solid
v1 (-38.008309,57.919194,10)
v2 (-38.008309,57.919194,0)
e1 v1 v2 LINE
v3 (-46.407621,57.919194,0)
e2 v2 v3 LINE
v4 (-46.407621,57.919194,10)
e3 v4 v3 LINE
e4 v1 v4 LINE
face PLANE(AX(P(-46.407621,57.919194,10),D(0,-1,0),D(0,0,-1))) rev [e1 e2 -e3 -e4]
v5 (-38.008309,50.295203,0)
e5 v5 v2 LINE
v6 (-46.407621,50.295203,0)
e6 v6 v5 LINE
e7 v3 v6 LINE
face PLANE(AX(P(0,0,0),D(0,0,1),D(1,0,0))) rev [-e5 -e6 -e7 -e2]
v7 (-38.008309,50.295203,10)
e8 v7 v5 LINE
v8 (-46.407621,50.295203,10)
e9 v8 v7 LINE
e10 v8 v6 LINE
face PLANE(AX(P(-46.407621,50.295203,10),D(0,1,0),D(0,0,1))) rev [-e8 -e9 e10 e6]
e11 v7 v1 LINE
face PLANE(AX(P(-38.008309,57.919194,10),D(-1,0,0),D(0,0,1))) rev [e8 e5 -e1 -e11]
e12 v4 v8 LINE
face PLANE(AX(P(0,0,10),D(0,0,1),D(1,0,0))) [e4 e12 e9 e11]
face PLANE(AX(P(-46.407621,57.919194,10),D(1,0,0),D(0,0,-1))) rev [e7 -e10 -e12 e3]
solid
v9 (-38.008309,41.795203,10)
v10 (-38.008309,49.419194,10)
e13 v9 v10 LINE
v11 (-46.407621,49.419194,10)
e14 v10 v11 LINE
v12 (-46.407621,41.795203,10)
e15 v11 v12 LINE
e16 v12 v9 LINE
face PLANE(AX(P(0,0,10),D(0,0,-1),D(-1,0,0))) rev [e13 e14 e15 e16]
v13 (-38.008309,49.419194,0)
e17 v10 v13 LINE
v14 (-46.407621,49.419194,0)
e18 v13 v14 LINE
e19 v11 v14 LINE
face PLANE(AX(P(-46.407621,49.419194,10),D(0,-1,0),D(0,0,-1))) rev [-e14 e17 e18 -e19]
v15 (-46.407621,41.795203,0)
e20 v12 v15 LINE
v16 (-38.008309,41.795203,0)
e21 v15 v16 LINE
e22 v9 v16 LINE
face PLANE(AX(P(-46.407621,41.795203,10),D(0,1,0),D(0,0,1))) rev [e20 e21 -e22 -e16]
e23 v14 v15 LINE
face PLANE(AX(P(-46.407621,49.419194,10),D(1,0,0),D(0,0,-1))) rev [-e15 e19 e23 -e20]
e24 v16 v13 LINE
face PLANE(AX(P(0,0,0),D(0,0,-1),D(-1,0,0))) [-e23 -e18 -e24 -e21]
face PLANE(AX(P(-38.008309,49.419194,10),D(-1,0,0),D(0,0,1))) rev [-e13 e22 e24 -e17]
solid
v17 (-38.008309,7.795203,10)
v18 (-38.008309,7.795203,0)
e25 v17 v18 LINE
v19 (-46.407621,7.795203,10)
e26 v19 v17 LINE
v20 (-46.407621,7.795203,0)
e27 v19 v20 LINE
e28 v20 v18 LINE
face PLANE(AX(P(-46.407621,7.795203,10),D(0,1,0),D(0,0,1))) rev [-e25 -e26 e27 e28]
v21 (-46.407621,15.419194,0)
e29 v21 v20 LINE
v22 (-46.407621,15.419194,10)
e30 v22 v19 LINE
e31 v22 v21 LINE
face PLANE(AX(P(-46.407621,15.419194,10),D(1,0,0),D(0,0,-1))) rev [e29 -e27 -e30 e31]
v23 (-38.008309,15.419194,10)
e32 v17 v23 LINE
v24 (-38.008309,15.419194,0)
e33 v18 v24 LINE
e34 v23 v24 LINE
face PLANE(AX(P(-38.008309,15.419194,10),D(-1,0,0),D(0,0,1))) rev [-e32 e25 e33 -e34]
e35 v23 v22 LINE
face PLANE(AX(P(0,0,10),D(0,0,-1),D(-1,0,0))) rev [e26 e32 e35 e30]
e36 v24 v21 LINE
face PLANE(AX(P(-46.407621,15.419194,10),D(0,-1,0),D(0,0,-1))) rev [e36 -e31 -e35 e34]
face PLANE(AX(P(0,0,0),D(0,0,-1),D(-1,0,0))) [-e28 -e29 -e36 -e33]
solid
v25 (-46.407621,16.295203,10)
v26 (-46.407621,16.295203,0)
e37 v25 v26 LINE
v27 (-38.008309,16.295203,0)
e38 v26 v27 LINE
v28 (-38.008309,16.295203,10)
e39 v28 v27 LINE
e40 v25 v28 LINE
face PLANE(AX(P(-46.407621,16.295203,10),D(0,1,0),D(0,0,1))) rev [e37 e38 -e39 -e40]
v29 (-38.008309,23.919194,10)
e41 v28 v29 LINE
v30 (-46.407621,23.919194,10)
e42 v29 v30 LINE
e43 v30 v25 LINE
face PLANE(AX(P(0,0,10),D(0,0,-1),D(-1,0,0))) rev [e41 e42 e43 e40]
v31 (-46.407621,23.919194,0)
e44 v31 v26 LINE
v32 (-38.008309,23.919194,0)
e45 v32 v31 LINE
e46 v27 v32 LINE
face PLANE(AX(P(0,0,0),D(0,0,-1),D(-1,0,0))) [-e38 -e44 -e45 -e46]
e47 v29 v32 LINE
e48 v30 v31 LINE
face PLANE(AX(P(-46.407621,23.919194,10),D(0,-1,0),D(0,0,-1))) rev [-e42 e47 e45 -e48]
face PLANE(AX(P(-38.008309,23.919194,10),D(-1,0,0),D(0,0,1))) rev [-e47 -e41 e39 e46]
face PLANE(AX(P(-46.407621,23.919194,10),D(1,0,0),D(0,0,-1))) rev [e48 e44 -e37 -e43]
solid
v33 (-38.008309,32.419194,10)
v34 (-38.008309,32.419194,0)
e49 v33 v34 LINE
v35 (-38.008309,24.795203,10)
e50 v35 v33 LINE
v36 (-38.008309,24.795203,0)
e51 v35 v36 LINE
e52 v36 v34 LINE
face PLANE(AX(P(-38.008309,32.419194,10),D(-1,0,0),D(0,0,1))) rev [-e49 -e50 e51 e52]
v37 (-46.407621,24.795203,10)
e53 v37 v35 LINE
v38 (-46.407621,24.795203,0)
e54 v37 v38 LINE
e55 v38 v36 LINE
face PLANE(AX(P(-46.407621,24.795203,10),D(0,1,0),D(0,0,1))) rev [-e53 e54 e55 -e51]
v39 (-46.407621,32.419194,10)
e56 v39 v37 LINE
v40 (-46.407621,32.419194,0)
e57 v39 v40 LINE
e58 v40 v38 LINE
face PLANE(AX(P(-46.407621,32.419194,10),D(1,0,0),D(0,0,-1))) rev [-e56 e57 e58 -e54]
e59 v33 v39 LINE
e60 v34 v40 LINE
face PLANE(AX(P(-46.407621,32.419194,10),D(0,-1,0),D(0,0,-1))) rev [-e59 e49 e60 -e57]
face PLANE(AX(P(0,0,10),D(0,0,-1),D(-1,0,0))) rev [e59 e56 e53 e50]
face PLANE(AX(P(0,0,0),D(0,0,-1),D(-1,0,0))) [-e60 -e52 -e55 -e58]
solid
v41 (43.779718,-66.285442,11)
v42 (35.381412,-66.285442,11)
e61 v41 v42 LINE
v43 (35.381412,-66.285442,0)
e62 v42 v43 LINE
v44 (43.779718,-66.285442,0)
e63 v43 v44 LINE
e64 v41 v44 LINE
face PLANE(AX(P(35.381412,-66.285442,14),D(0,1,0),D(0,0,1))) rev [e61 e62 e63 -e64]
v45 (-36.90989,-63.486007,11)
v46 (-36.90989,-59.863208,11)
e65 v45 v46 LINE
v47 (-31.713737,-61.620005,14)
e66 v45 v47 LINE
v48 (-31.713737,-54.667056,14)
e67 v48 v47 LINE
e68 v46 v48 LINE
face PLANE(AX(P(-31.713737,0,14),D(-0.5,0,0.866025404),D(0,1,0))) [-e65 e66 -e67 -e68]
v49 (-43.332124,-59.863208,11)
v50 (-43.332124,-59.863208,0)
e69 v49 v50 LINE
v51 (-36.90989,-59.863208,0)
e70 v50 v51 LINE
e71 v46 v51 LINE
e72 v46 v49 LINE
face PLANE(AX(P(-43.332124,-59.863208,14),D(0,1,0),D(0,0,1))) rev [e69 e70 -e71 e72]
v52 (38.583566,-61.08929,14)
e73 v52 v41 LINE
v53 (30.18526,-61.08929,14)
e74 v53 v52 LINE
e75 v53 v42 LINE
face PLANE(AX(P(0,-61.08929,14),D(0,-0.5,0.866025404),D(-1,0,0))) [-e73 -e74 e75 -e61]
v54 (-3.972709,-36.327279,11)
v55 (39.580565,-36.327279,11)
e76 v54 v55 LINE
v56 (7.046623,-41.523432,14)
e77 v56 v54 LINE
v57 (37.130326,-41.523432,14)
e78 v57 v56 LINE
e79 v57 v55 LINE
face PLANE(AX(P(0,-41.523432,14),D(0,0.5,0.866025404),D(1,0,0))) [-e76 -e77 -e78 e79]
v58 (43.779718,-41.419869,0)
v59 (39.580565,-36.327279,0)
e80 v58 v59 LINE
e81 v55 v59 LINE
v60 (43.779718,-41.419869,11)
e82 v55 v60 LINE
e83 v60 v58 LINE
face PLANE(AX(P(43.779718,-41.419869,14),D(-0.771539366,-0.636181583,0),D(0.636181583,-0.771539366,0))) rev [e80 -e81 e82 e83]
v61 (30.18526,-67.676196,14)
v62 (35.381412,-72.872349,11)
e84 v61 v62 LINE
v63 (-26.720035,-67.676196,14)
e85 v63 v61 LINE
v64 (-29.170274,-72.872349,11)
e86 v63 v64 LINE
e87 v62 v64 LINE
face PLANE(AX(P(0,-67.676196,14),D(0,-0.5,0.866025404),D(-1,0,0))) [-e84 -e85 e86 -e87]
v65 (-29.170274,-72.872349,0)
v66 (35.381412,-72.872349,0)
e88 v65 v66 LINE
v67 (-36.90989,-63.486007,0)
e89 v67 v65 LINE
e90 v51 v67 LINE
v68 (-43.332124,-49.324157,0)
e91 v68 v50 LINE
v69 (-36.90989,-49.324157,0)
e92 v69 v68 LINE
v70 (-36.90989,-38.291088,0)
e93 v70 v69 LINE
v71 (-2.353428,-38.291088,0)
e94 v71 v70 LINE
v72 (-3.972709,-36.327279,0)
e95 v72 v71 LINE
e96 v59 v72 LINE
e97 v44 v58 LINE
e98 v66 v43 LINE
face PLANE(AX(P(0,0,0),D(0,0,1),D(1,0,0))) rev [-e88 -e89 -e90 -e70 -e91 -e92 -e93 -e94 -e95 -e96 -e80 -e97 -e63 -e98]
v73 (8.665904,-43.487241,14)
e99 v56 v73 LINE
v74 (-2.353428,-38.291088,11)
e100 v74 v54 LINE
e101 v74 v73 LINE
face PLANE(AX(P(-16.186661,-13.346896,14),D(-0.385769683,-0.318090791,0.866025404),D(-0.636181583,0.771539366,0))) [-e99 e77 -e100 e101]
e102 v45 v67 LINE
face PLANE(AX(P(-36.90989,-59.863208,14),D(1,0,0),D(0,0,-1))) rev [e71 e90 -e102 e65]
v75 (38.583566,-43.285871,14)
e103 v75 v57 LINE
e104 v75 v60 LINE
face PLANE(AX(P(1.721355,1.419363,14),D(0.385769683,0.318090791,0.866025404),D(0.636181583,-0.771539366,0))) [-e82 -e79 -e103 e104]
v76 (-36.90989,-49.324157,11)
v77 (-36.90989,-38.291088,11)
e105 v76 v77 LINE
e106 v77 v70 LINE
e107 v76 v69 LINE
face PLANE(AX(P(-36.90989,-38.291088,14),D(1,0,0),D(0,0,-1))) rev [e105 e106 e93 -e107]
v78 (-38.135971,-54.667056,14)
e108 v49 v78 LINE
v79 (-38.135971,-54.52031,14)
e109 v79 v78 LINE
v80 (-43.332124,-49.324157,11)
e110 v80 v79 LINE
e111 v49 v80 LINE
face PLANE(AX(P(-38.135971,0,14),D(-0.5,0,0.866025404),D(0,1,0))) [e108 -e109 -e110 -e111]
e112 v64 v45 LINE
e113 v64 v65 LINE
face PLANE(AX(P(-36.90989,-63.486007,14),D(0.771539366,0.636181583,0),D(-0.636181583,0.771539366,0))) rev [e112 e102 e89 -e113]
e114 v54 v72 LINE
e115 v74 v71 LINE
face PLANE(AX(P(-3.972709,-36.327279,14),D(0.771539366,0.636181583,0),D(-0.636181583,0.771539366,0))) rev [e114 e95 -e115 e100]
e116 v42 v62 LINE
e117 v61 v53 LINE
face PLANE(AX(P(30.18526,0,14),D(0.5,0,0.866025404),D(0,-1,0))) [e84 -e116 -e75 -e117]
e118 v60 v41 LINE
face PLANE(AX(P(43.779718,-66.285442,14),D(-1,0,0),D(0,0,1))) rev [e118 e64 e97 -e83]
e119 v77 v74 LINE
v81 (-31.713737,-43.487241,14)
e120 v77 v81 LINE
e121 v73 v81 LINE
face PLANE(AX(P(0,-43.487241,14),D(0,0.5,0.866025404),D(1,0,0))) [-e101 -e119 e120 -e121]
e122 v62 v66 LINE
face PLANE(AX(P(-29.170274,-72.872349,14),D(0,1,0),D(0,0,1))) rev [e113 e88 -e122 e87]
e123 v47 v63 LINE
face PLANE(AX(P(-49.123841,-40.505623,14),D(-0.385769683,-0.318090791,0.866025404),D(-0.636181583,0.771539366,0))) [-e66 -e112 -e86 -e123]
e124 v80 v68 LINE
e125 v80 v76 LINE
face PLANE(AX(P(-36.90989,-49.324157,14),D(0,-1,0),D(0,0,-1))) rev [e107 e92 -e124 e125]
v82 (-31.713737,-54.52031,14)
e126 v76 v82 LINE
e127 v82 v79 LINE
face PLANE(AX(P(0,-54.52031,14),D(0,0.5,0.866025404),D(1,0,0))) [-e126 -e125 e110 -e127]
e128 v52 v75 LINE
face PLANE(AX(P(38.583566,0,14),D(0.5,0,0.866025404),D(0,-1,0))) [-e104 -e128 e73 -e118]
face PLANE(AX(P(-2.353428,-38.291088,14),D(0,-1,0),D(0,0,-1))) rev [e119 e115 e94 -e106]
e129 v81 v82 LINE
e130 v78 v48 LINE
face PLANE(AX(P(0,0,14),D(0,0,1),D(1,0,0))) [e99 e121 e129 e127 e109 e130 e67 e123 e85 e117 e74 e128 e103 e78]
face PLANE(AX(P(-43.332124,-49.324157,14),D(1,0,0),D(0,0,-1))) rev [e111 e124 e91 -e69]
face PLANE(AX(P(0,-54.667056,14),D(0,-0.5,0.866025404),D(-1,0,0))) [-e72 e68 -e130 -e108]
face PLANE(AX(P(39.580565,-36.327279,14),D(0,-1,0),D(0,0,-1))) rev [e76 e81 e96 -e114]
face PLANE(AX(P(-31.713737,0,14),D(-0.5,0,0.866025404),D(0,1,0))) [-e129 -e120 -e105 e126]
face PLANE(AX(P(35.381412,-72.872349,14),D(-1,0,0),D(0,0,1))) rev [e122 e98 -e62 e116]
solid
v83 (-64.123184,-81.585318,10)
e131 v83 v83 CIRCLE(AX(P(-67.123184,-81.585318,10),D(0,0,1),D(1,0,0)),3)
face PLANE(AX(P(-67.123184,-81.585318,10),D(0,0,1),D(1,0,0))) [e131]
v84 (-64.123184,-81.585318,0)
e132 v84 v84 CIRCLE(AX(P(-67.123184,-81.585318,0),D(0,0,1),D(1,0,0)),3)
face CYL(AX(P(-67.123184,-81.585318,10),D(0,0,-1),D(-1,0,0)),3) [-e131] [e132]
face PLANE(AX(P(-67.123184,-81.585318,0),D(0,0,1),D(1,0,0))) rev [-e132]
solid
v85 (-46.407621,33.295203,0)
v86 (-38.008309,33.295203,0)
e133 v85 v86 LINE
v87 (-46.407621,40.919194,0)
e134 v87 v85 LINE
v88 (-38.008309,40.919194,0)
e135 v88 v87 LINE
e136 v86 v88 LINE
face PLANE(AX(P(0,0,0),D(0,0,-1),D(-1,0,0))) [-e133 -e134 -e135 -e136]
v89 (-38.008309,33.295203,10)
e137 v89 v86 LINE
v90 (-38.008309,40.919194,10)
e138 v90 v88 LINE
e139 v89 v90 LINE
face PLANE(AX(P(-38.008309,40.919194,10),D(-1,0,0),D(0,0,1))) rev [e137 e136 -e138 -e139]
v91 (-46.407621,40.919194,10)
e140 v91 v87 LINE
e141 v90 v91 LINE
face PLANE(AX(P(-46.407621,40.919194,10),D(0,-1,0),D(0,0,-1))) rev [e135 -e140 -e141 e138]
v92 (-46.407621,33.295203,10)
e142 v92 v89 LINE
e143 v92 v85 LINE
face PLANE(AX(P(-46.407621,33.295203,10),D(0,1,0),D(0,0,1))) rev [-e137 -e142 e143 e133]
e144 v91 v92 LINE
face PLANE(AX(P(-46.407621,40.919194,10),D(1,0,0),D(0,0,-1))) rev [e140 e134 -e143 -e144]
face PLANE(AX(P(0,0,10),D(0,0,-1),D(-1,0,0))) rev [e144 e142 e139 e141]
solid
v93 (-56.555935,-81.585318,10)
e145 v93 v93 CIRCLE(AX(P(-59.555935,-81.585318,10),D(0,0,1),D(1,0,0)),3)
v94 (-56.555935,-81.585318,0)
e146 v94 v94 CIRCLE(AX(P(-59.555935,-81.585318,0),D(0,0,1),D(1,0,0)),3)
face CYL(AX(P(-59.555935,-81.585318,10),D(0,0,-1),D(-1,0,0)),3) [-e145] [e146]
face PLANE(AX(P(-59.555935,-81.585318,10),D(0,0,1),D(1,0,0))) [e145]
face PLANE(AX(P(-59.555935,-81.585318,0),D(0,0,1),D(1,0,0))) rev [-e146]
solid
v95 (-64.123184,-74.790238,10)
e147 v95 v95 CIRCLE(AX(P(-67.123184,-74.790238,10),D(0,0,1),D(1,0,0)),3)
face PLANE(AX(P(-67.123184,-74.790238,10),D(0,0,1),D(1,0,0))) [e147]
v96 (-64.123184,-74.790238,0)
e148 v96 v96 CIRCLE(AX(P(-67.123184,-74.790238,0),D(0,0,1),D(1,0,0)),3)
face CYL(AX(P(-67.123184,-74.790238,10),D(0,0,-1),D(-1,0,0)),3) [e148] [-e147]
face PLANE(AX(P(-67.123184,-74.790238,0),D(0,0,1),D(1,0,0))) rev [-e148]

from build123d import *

# Parameters (mm, degrees)
EXTRUDE_1_DEPTH   = 14
SKETCH_2_R        = 3
EXTRUDE_2_DEPTH   = 10
EXTRUDE_2_2_DEPTH = 10
EXTRUDE_2_3_DEPTH = 10
SKETCH_2_W        = 8.399311933
SKETCH_2_H        = 7.623990832
EXTRUDE_2_4_DEPTH = 10
EXTRUDE_2_5_DEPTH = 10
EXTRUDE_2_6_DEPTH = 10
EXTRUDE_2_7_DEPTH = 10
EXTRUDE_2_8_DEPTH = 10
EXTRUDE_2_9_DEPTH = 10


with BuildPart() as part:
    # Эскиз1 → Бобышка-Вытянуть1 (new body)
    with BuildSketch(Plane.XY):
        Polygon((-36.909889511, -38.291088482), (-36.909889511, -49.324157276), (-43.332123585, -49.324157276), (-43.332123585, -59.863208064), (-36.909889511, -59.863208064), (-36.909889511, -63.486006772), (-29.170274088, -72.87234888), (35.381411989, -72.87234888), (35.381411989, -66.285442138), (43.779718086, -66.285442138), (43.779718086, -41.419869184), (39.580565037, -36.327279317), (-3.972709406, -36.327279317), (-2.353428165, -38.291088482), align=None)
    extrude(amount=EXTRUDE_1_DEPTH)

    # Фаска1
    # the kernel refuses this chamfer: 5.196152423, 3 mm, written as the material it takes off along each edge
    with BuildSketch(Plane(origin=(-36.909889511, -49.324157276, 14), x_dir=(0, 0.0578938624026709, -0.9983227437537926), z_dir=(-1, 0, 0)), Plane(origin=(-43.332123585, -59.863208064, 14), x_dir=(0, -0.0578938624026709, -0.9983227437537926), z_dir=(1, 0, 0))) as chamfer_1_piece_1:
        with BuildLine():
            Line((3.109137869, 0), (-0.414994971, 5.361118731))
            Line((-0.414994971, 5.361118731), (-0.518743714, 5.355102224))
            ThreePointArc((-0.518743714, 5.355102224), (-0.259371857, 2.677551112), (-0.103748743, -0.006016507))
            Line((-0.103748743, -0.006016507), (0.006016507, -0.103748743))
            ThreePointArc((0.006016507, -0.103748743), (1.555374994, -0.013899696), (3.115154376, -0.103748743))
            Line((3.115154376, -0.103748743), (3.109137869, 0))
        make_face()
    extrude(amount=6.422234074, mode=Mode.SUBTRACT)
    with BuildSketch(Plane(origin=(-43.332123585, -49.324157276, 14), x_dir=(-0.0578938624026709, 0, -0.9983227437537926), z_dir=(0, -1, 0))) as chamfer_1_piece_2:
        with BuildLine():
            Line((3.109137869, 0), (-0.414994971, 5.361118731))
            Line((-0.414994971, 5.361118731), (-0.518743714, 5.355102224))
            ThreePointArc((-0.518743714, 5.355102224), (-0.259371857, 2.677551112), (-0.103748743, -0.006016507))
            Line((-0.103748743, -0.006016507), (0.006016507, -0.103748743))
            ThreePointArc((0.006016507, -0.103748743), (1.555374994, -0.013899696), (3.115154376, -0.103748743))
            Line((3.115154376, -0.103748743), (3.109137869, 0))
        make_face()
    extrude(amount=10.539050788, mode=Mode.SUBTRACT)
    with BuildSketch(Plane(origin=(-36.909889511, -59.863208064, 14), x_dir=(-0.0578938624026709, 0, -0.9983227437537926), z_dir=(0, -1, 0))) as chamfer_1_piece_3_section:
        with BuildLine():
            Line((3.109137869, 0), (-0.414994971, 5.361118731))
            Line((-0.414994971, 5.361118731), (-0.518743714, 5.355102224))
            ThreePointArc((-0.518743714, 5.355102224), (-0.259371857, 2.677551112), (-0.103748743, -0.006016507))
            Line((-0.103748743, -0.006016507), (0.006016507, -0.103748743))
            ThreePointArc((0.006016507, -0.103748743), (1.555374994, -0.013899696), (3.115154376, -0.103748743))
            Line((3.115154376, -0.103748743), (3.109137869, 0))
        make_face()
    chamfer_1_piece_3 = extrude(amount=17.06569062, mode=Mode.PRIVATE)
    chamfer_1_piece_3 = split(chamfer_1_piece_3, bisect_by=Plane(origin=(-36.310735652, -64.212640175, 13.15573984), z_dir=(0.7715393663129642, 0.6361815827492885, 0)), keep=Keep.TOP, mode=Mode.PRIVATE)
    add(chamfer_1_piece_3, mode=Mode.SUBTRACT)
    with BuildSketch(Plane(origin=(-45.462009764, -53.114286465, 14), x_dir=(-0.04466739391156679, -0.03683100901480082, -0.9983227437537926), z_dir=(0.6361815827492885, -0.7715393663129642, 0))) as chamfer_1_piece_4_section:
        with BuildLine():
            Line((3.109137869, 0), (-0.414994971, 5.361118731))
            Line((-0.414994971, 5.361118731), (-0.518743714, 5.355102224))
            ThreePointArc((-0.518743714, 5.355102224), (-0.259371857, 2.677551112), (-0.103748743, -0.006016507))
            Line((-0.103748743, -0.006016507), (0.006016507, -0.103748743))
            ThreePointArc((0.006016507, -0.103748743), (1.555374994, -0.013899696), (3.115154376, -0.103748743))
            Line((3.115154376, -0.103748743), (3.109137869, 0))
        make_face()
    chamfer_1_piece_4 = extrude(amount=39.051517055, mode=Mode.PRIVATE)
    chamfer_1_piece_4 = split(chamfer_1_piece_4, bisect_by=Plane(origin=(-36.909889511, -66.628217191, 13.110188551), z_dir=(1, 0, 0)), keep=Keep.TOP, mode=Mode.PRIVATE)
    chamfer_1_piece_4 = split(chamfer_1_piece_4, bisect_by=Plane(origin=(-31.761219521, -72.87234888, 13.110188551), z_dir=(0, 1, 0)), keep=Keep.TOP, mode=Mode.PRIVATE)
    add(chamfer_1_piece_4, mode=Mode.SUBTRACT)
    with BuildSketch(Plane(origin=(-42.613166, -72.87234888, 14), x_dir=(0, -0.05789386240267318, -0.9983227437537925), z_dir=(1, 0, 0))) as chamfer_1_piece_5_section:
        with BuildLine():
            Line((3.109137869, 0), (-0.414994971, 5.361118731))
            Line((-0.414994971, 5.361118731), (-0.518743714, 5.355102224))
            ThreePointArc((-0.518743714, 5.355102224), (-0.259371857, 2.677551112), (-0.103748743, -0.006016507))
            Line((-0.103748743, -0.006016507), (0.006016507, -0.103748743))
            ThreePointArc((0.006016507, -0.103748743), (1.555374994, -0.013899696), (3.115154376, -0.103748743))
            Line((3.115154376, -0.103748743), (3.109137869, 0))
        make_face()
    chamfer_1_piece_5 = extrude(amount=77.994577989, mode=Mode.PRIVATE)
    chamfer_1_piece_5 = split(chamfer_1_piece_5, bisect_by=Plane(origin=(-17.2681662, -87.306820149, 13.044949629), z_dir=(0.7715393663129642, 0.6361815827492885, 0)), keep=Keep.TOP, mode=Mode.PRIVATE)
    add(chamfer_1_piece_5, mode=Mode.SUBTRACT)
    with BuildSketch(Plane(origin=(35.381411989, -72.87234888, 14), x_dir=(0.0578938624026709, 0, -0.9983227437537926), z_dir=(0, 1, 0))) as chamfer_1_piece_6:
        with BuildLine():
            Line((3.109137869, 0), (-0.414994971, 5.361118731))
            Line((-0.414994971, 5.361118731), (-0.518743714, 5.355102224))
            ThreePointArc((-0.518743714, 5.355102224), (-0.259371857, 2.677551112), (-0.103748743, -0.006016507))
            Line((-0.103748743, -0.006016507), (0.006016507, -0.103748743))
            ThreePointArc((0.006016507, -0.103748743), (1.555374994, -0.013899696), (3.115154376, -0.103748743))
            Line((3.115154376, -0.103748743), (3.109137869, 0))
        make_face()
    extrude(amount=6.586906743, mode=Mode.SUBTRACT)
    with BuildSketch(Plane(origin=(35.381411989, -66.285442138, 14), x_dir=(0, -0.05789386240267318, -0.9983227437537925), z_dir=(1, 0, 0))) as chamfer_1_piece_7:
        with BuildLine():
            Line((3.109137869, 0), (-0.414994971, 5.361118731))
            Line((-0.414994971, 5.361118731), (-0.518743714, 5.355102224))
            ThreePointArc((-0.518743714, 5.355102224), (-0.259371857, 2.677551112), (-0.103748743, -0.006016507))
            Line((-0.103748743, -0.006016507), (0.006016507, -0.103748743))
            ThreePointArc((0.006016507, -0.103748743), (1.555374994, -0.013899696), (3.115154376, -0.103748743))
            Line((3.115154376, -0.103748743), (3.109137869, 0))
        make_face()
    extrude(amount=8.398306097, mode=Mode.SUBTRACT)
    with BuildSketch(Plane(origin=(43.779718086, -66.285442138, 14), x_dir=(0.0578938624026709, 0, -0.9983227437537926), z_dir=(0, 1, 0))) as chamfer_1_piece_8_section:
        with BuildLine():
            Line((3.109137869, 0), (-0.414994971, 5.361118731))
            Line((-0.414994971, 5.361118731), (-0.518743714, 5.355102224))
            ThreePointArc((-0.518743714, 5.355102224), (-0.259371857, 2.677551112), (-0.103748743, -0.006016507))
            Line((-0.103748743, -0.006016507), (0.006016507, -0.103748743))
            ThreePointArc((0.006016507, -0.103748743), (1.555374994, -0.013899696), (3.115154376, -0.103748743))
            Line((3.115154376, -0.103748743), (3.109137869, 0))
        make_face()
    chamfer_1_piece_8 = extrude(amount=38.308464865, mode=Mode.PRIVATE)
    chamfer_1_piece_8 = split(chamfer_1_piece_8, bisect_by=Plane(origin=(48.602023871, -47.268197478, 13.0630262), z_dir=(-0.7715393663129643, -0.6361815827492884, 0)), keep=Keep.TOP, mode=Mode.PRIVATE)
    add(chamfer_1_piece_8, mode=Mode.SUBTRACT)
    with BuildSketch(Plane(origin=(52.331838339, -51.791589491, 14), x_dir=(0.04466739391156704, 0.036831009014801006, -0.9983227437537926), z_dir=(-0.6361815827492884, 0.7715393663129643, 0))) as chamfer_1_piece_9_section:
        with BuildLine():
            Line((3.109137869, 0), (-0.414994971, 5.361118731))
            Line((-0.414994971, 5.361118731), (-0.518743714, 5.355102224))
            ThreePointArc((-0.518743714, 5.355102224), (-0.259371857, 2.677551112), (-0.103748743, -0.006016507))
            Line((-0.103748743, -0.006016507), (0.006016507, -0.103748743))
            ThreePointArc((0.006016507, -0.103748743), (1.555374994, -0.013899696), (3.115154376, -0.103748743))
            Line((3.115154376, -0.103748743), (3.109137869, 0))
        make_face()
    chamfer_1_piece_9 = extrude(amount=33.486341215, mode=Mode.PRIVATE)
    chamfer_1_piece_9 = split(chamfer_1_piece_9, bisect_by=Plane(origin=(43.779718086, -40.523934217, 13.149770443), z_dir=(-1, 0, 0)), keep=Keep.TOP, mode=Mode.PRIVATE)
    chamfer_1_piece_9 = split(chamfer_1_piece_9, bisect_by=Plane(origin=(40.319318432, -36.327279317, 13.149770443), z_dir=(0, -1, 0)), keep=Keep.TOP, mode=Mode.PRIVATE)
    add(chamfer_1_piece_9, mode=Mode.SUBTRACT)
    with BuildSketch(Plane(origin=(11.089463747, -38.291088482, 14), x_dir=(0, 0.0578938624026709, -0.9983227437537926), z_dir=(-1, 0, 0))) as chamfer_1_piece_10_section:
        with BuildLine():
            Line((3.109137869, 0), (-0.414994971, 5.361118731))
            Line((-0.414994971, 5.361118731), (-0.518743714, 5.355102224))
            ThreePointArc((-0.518743714, 5.355102224), (-0.259371857, 2.677551112), (-0.103748743, -0.006016507))
            Line((-0.103748743, -0.006016507), (0.006016507, -0.103748743))
            ThreePointArc((0.006016507, -0.103748743), (1.555374994, -0.013899696), (3.115154376, -0.103748743))
            Line((3.115154376, -0.103748743), (3.109137869, 0))
        make_face()
    chamfer_1_piece_10 = extrude(amount=47.999353257, mode=Mode.PRIVATE)
    chamfer_1_piece_10 = split(chamfer_1_piece_10, bisect_by=Plane(origin=(-8.173409607, -31.232813116, 13.050749195), z_dir=(-0.7715393663129635, -0.6361815827492894, 0)), keep=Keep.TOP, mode=Mode.PRIVATE)
    add(chamfer_1_piece_10, mode=Mode.SUBTRACT)
    with BuildSketch(Plane(origin=(53.023456949, -36.327279317, 14), x_dir=(0, 0.0578938624026709, -0.9983227437537926), z_dir=(-1, 0, 0))) as chamfer_1_piece_11_section:
        with BuildLine():
            Line((3.109137869, 0), (-0.414994971, 5.361118731))
            Line((-0.414994971, 5.361118731), (-0.518743714, 5.355102224))
            ThreePointArc((-0.518743714, 5.355102224), (-0.259371857, 2.677551112), (-0.103748743, -0.006016507))
            Line((-0.103748743, -0.006016507), (0.006016507, -0.103748743))
            ThreePointArc((0.006016507, -0.103748743), (1.555374994, -0.013899696), (3.115154376, -0.103748743))
            Line((3.115154376, -0.103748743), (3.109137869, 0))
        make_face()
    chamfer_1_piece_11 = extrude(amount=70.439058267, mode=Mode.PRIVATE)
    chamfer_1_piece_11 = split(chamfer_1_piece_11, bisect_by=Plane(origin=(32.203932865, -27.381150939, 13.037990314), z_dir=(-0.7715393663129643, -0.6361815827492884, 0)), keep=Keep.TOP, mode=Mode.PRIVATE)
    chamfer_1_piece_11 = split(chamfer_1_piece_11, bisect_by=Plane(origin=(6.277844799, -48.758802502, 13.037990314), z_dir=(0.7715393663129635, 0.6361815827492894, 0)), keep=Keep.TOP, mode=Mode.PRIVATE)
    add(chamfer_1_piece_11, mode=Mode.SUBTRACT)
    with BuildSketch(Plane(origin=(-12.524829659, -25.95555901, 14), x_dir=(-0.04466739391156709, -0.03683100901480115, -0.9983227437537926), z_dir=(0.6361815827492894, -0.7715393663129635, 0))) as chamfer_1_piece_12_section:
        with BuildLine():
            Line((3.109137869, 0), (-0.414994971, 5.361118731))
            Line((-0.414994971, 5.361118731), (-0.518743714, 5.355102224))
            ThreePointArc((-0.518743714, 5.355102224), (-0.259371857, 2.677551112), (-0.103748743, -0.006016507))
            Line((-0.103748743, -0.006016507), (0.006016507, -0.103748743))
            ThreePointArc((0.006016507, -0.103748743), (1.555374994, -0.013899696), (3.115154376, -0.103748743))
            Line((3.115154376, -0.103748743), (3.109137869, 0))
        make_face()
    chamfer_1_piece_12 = extrude(amount=29.431096805, mode=Mode.PRIVATE)
    chamfer_1_piece_12 = split(chamfer_1_piece_12, bisect_by=Plane(origin=(-6.345177041, -38.291088482, 13.06885324), z_dir=(0, 1, 0)), keep=Keep.TOP, mode=Mode.PRIVATE)
    add(chamfer_1_piece_12, mode=Mode.SUBTRACT)
    with BuildSketch(Plane(origin=(-36.909889511, -38.291088482, 14), x_dir=(-0.0578938624026709, 0, -0.9983227437537926), z_dir=(0, -1, 0))) as chamfer_1_piece_13:
        with BuildLine():
            Line((3.109137869, 0), (-0.414994971, 5.361118731))
            Line((-0.414994971, 5.361118731), (-0.518743714, 5.355102224))
            ThreePointArc((-0.518743714, 5.355102224), (-0.259371857, 2.677551112), (-0.103748743, -0.006016507))
            Line((-0.103748743, -0.006016507), (0.006016507, -0.103748743))
            ThreePointArc((0.006016507, -0.103748743), (1.555374994, -0.013899696), (3.115154376, -0.103748743))
            Line((3.115154376, -0.103748743), (3.109137869, 0))
        make_face()
    extrude(amount=11.033068794, mode=Mode.SUBTRACT)
    with BuildSketch(Plane(origin=(-36.909889511, -38.291088482, 14), x_dir=(-0.0578938624026709, 0, -0.9983227437537926), z_dir=(0, -1, 0))) as chamfer_1_piece_14a_section:
        with BuildLine():
            Line((3.109137869, 0), (-0.414994971, 5.361118731))
            Line((-0.414994971, 5.361118731), (-0.518743714, 5.355102224))
            ThreePointArc((-0.518743714, 5.355102224), (-0.259371857, 2.677551112), (-0.103748743, -0.006016507))
            Line((-0.103748743, -0.006016507), (0.006016507, -0.103748743))
            ThreePointArc((0.006016507, -0.103748743), (1.555374994, -0.013899696), (3.115154376, -0.103748743))
            Line((3.115154376, -0.103748743), (3.109137869, 0))
        make_face()
    chamfer_1_piece_14a = extrude(amount=24.475960706, mode=Mode.PRIVATE)
    chamfer_1_piece_14a = split(chamfer_1_piece_14a, bisect_by=Plane(origin=(-35.167192108, -49.324157276, 13.037990314), z_dir=(0, -1, 0)), keep=Keep.TOP, mode=Mode.PRIVATE)
    with BuildSketch(Plane(origin=(-23.466997599, -49.324157276, 14), x_dir=(0, 0.0578938624026709, -0.9983227437537926), z_dir=(-1, 0, 0))) as chamfer_1_piece_14b_section:
        with BuildLine():
            Line((3.109137869, 0), (-0.414994971, 5.361118731))
            Line((-0.414994971, 5.361118731), (-0.518743714, 5.355102224))
            ThreePointArc((-0.518743714, 5.355102224), (-0.259371857, 2.677551112), (-0.103748743, -0.006016507))
            Line((-0.103748743, -0.006016507), (0.006016507, -0.103748743))
            ThreePointArc((0.006016507, -0.103748743), (1.555374994, -0.013899696), (3.115154376, -0.103748743))
            Line((3.115154376, -0.103748743), (3.109137869, 0))
        make_face()
    chamfer_1_piece_14b = extrude(amount=19.865125986, mode=Mode.PRIVATE)
    chamfer_1_piece_14b = split(chamfer_1_piece_14b, bisect_by=Plane(origin=(-36.909889511, -51.066854679, 13.037990314), z_dir=(1, 0, 0)), keep=Keep.TOP, mode=Mode.PRIVATE)
    chamfer_1_piece_14 = chamfer_1_piece_14a & chamfer_1_piece_14b
    add(chamfer_1_piece_14, mode=Mode.SUBTRACT)
    with BuildSketch(Plane(origin=(-36.909889511, -49.324157276, 14), x_dir=(0, 0.0578938624026709, -0.9983227437537926), z_dir=(-1, 0, 0))) as chamfer_1_piece_15a_section:
        with BuildLine():
            Line((3.109137869, 0), (-0.414994971, 5.361118731))
            Line((-0.414994971, 5.361118731), (-0.518743714, 5.355102224))
            ThreePointArc((-0.518743714, 5.355102224), (-0.259371857, 2.677551112), (-0.103748743, -0.006016507))
            Line((-0.103748743, -0.006016507), (0.006016507, -0.103748743))
            ThreePointArc((0.006016507, -0.103748743), (1.555374994, -0.013899696), (3.115154376, -0.103748743))
            Line((3.115154376, -0.103748743), (3.109137869, 0))
        make_face()
    chamfer_1_piece_15a = extrude(amount=19.865125986, mode=Mode.PRIVATE)
    chamfer_1_piece_15a = split(chamfer_1_piece_15a, bisect_by=Plane(origin=(-43.332123585, -51.066854679, 13.037990314), z_dir=(-1, 0, 0)), keep=Keep.TOP, mode=Mode.PRIVATE)
    with BuildSketch(Plane(origin=(-43.332123585, -35.881265364, 14), x_dir=(-0.0578938624026709, 0, -0.9983227437537926), z_dir=(0, -1, 0))) as chamfer_1_piece_15b_section:
        with BuildLine():
            Line((3.109137869, 0), (-0.414994971, 5.361118731))
            Line((-0.414994971, 5.361118731), (-0.518743714, 5.355102224))
            ThreePointArc((-0.518743714, 5.355102224), (-0.259371857, 2.677551112), (-0.103748743, -0.006016507))
            Line((-0.103748743, -0.006016507), (0.006016507, -0.103748743))
            ThreePointArc((0.006016507, -0.103748743), (1.555374994, -0.013899696), (3.115154376, -0.103748743))
            Line((3.115154376, -0.103748743), (3.109137869, 0))
        make_face()
    chamfer_1_piece_15b = extrude(amount=23.9819427, mode=Mode.PRIVATE)
    chamfer_1_piece_15b = split(chamfer_1_piece_15b, bisect_by=Plane(origin=(-41.589426182, -49.324157276, 13.037990314), z_dir=(0, 1, 0)), keep=Keep.TOP, mode=Mode.PRIVATE)
    chamfer_1_piece_15 = chamfer_1_piece_15a & chamfer_1_piece_15b
    add(chamfer_1_piece_15, mode=Mode.SUBTRACT)
    with BuildSketch(Plane(origin=(-43.332123585, -49.324157276, 14), x_dir=(-0.0578938624026709, 0, -0.9983227437537926), z_dir=(0, -1, 0))) as chamfer_1_piece_16a_section:
        with BuildLine():
            Line((3.109137869, 0), (-0.414994971, 5.361118731))
            Line((-0.414994971, 5.361118731), (-0.518743714, 5.355102224))
            ThreePointArc((-0.518743714, 5.355102224), (-0.259371857, 2.677551112), (-0.103748743, -0.006016507))
            Line((-0.103748743, -0.006016507), (0.006016507, -0.103748743))
            ThreePointArc((0.006016507, -0.103748743), (1.555374994, -0.013899696), (3.115154376, -0.103748743))
            Line((3.115154376, -0.103748743), (3.109137869, 0))
        make_face()
    chamfer_1_piece_16a = extrude(amount=23.9819427, mode=Mode.PRIVATE)
    chamfer_1_piece_16a = split(chamfer_1_piece_16a, bisect_by=Plane(origin=(-41.589426182, -59.863208064, 13.037990314), z_dir=(0, -1, 0)), keep=Keep.TOP, mode=Mode.PRIVATE)
    with BuildSketch(Plane(origin=(-56.775015497, -59.863208064, 14), x_dir=(0, -0.0578938624026709, -0.9983227437537926), z_dir=(1, 0, 0))) as chamfer_1_piece_16b_section:
        with BuildLine():
            Line((3.109137869, 0), (-0.414994971, 5.361118731))
            Line((-0.414994971, 5.361118731), (-0.518743714, 5.355102224))
            ThreePointArc((-0.518743714, 5.355102224), (-0.259371857, 2.677551112), (-0.103748743, -0.006016507))
            Line((-0.103748743, -0.006016507), (0.006016507, -0.103748743))
            ThreePointArc((0.006016507, -0.103748743), (1.555374994, -0.013899696), (3.115154376, -0.103748743))
            Line((3.115154376, -0.103748743), (3.109137869, 0))
        make_face()
    chamfer_1_piece_16b = extrude(amount=19.865125986, mode=Mode.PRIVATE)
    chamfer_1_piece_16b = split(chamfer_1_piece_16b, bisect_by=Plane(origin=(-43.332123585, -58.120510661, 13.037990314), z_dir=(-1, 0, 0)), keep=Keep.TOP, mode=Mode.PRIVATE)
    chamfer_1_piece_16 = chamfer_1_piece_16a & chamfer_1_piece_16b
    add(chamfer_1_piece_16, mode=Mode.SUBTRACT)
    with BuildSketch(Plane(origin=(-43.332123585, -59.863208064, 14), x_dir=(0, -0.0578938624026709, -0.9983227437537926), z_dir=(1, 0, 0))) as chamfer_1_piece_17a_section:
        with BuildLine():
            Line((3.109137869, 0), (-0.414994971, 5.361118731))
            Line((-0.414994971, 5.361118731), (-0.518743714, 5.355102224))
            ThreePointArc((-0.518743714, 5.355102224), (-0.259371857, 2.677551112), (-0.103748743, -0.006016507))
            Line((-0.103748743, -0.006016507), (0.006016507, -0.103748743))
            ThreePointArc((0.006016507, -0.103748743), (1.555374994, -0.013899696), (3.115154376, -0.103748743))
            Line((3.115154376, -0.103748743), (3.109137869, 0))
        make_face()
    chamfer_1_piece_17a = extrude(amount=19.865125986, mode=Mode.PRIVATE)
    chamfer_1_piece_17a = split(chamfer_1_piece_17a, bisect_by=Plane(origin=(-36.909889511, -58.120510661, 13.037990314), z_dir=(1, 0, 0)), keep=Keep.TOP, mode=Mode.PRIVATE)
    with BuildSketch(Plane(origin=(-36.909889511, -46.420316152, 14), x_dir=(-0.0578938624026709, 0, -0.9983227437537926), z_dir=(0, -1, 0))) as chamfer_1_piece_17b_section:
        with BuildLine():
            Line((3.109137869, 0), (-0.414994971, 5.361118731))
            Line((-0.414994971, 5.361118731), (-0.518743714, 5.355102224))
            ThreePointArc((-0.518743714, 5.355102224), (-0.259371857, 2.677551112), (-0.103748743, -0.006016507))
            Line((-0.103748743, -0.006016507), (0.006016507, -0.103748743))
            ThreePointArc((0.006016507, -0.103748743), (1.555374994, -0.013899696), (3.115154376, -0.103748743))
            Line((3.115154376, -0.103748743), (3.109137869, 0))
        make_face()
    chamfer_1_piece_17b = extrude(amount=30.508582532, mode=Mode.PRIVATE)
    chamfer_1_piece_17b = split(chamfer_1_piece_17b, bisect_by=Plane(origin=(-35.167192108, -59.863208064, 13.037990314), z_dir=(0, 1, 0)), keep=Keep.TOP, mode=Mode.PRIVATE)
    chamfer_1_piece_17 = chamfer_1_piece_17a & chamfer_1_piece_17b
    add(chamfer_1_piece_17, mode=Mode.SUBTRACT)
    with BuildSketch(Plane(origin=(-36.909889511, -59.863208064, 14), x_dir=(-0.0578938624026709, 0, -0.9983227437537926), z_dir=(0, -1, 0))) as chamfer_1_piece_18a_section:
        with BuildLine():
            Line((3.109137869, 0), (-0.414994971, 5.361118731))
            Line((-0.414994971, 5.361118731), (-0.518743714, 5.355102224))
            ThreePointArc((-0.518743714, 5.355102224), (-0.259371857, 2.677551112), (-0.103748743, -0.006016507))
            Line((-0.103748743, -0.006016507), (0.006016507, -0.103748743))
            ThreePointArc((0.006016507, -0.103748743), (1.555374994, -0.013899696), (3.115154376, -0.103748743))
            Line((3.115154376, -0.103748743), (3.109137869, 0))
        make_face()
    chamfer_1_piece_18a = extrude(amount=17.06569062, mode=Mode.PRIVATE)
    chamfer_1_piece_18a = split(chamfer_1_piece_18a, bisect_by=Plane(origin=(-32.520529526, -68.809273136, 12.978371613), z_dir=(-0.7715393663129642, -0.6361815827492885, 0)), keep=Keep.TOP, mode=Mode.PRIVATE)
    with BuildSketch(Plane(origin=(-45.462009764, -53.114286465, 14), x_dir=(-0.04466739391156679, -0.03683100901480082, -0.9983227437537926), z_dir=(0.6361815827492885, -0.7715393663129642, 0))) as chamfer_1_piece_18b_section:
        with BuildLine():
            Line((3.109137869, 0), (-0.414994971, 5.361118731))
            Line((-0.414994971, 5.361118731), (-0.518743714, 5.355102224))
            ThreePointArc((-0.518743714, 5.355102224), (-0.259371857, 2.677551112), (-0.103748743, -0.006016507))
            Line((-0.103748743, -0.006016507), (0.006016507, -0.103748743))
            ThreePointArc((0.006016507, -0.103748743), (1.555374994, -0.013899696), (3.115154376, -0.103748743))
            Line((3.115154376, -0.103748743), (3.109137869, 0))
        make_face()
    chamfer_1_piece_18b = extrude(amount=39.051517055, mode=Mode.PRIVATE)
    chamfer_1_piece_18b = split(chamfer_1_piece_18b, bisect_by=Plane(origin=(-36.909889511, -56.586467233, 12.978371613), z_dir=(-1, 0, 0)), keep=Keep.TOP, mode=Mode.PRIVATE)
    chamfer_1_piece_18 = chamfer_1_piece_18a & chamfer_1_piece_18b
    add(chamfer_1_piece_18, mode=Mode.SUBTRACT)
    with BuildSketch(Plane(origin=(-45.462009764, -53.114286465, 14), x_dir=(-0.04466739391156679, -0.03683100901480082, -0.9983227437537926), z_dir=(0.6361815827492885, -0.7715393663129642, 0))) as chamfer_1_piece_19a_section:
        with BuildLine():
            Line((3.109137869, 0), (-0.414994971, 5.361118731))
            Line((-0.414994971, 5.361118731), (-0.518743714, 5.355102224))
            ThreePointArc((-0.518743714, 5.355102224), (-0.259371857, 2.677551112), (-0.103748743, -0.006016507))
            Line((-0.103748743, -0.006016507), (0.006016507, -0.103748743))
            ThreePointArc((0.006016507, -0.103748743), (1.555374994, -0.013899696), (3.115154376, -0.103748743))
            Line((3.115154376, -0.103748743), (3.109137869, 0))
        make_face()
    chamfer_1_piece_19a = extrude(amount=39.051517055, mode=Mode.PRIVATE)
    chamfer_1_piece_19a = split(chamfer_1_piece_19a, bisect_by=Plane(origin=(-23.218923028, -72.87234888, 12.999739571), z_dir=(0, -1, 0)), keep=Keep.TOP, mode=Mode.PRIVATE)
    with BuildSketch(Plane(origin=(-42.613166, -72.87234888, 14), x_dir=(0, -0.05789386240267318, -0.9983227437537925), z_dir=(1, 0, 0))) as chamfer_1_piece_19b_section:
        with BuildLine():
            Line((3.109137869, 0), (-0.414994971, 5.361118731))
            Line((-0.414994971, 5.361118731), (-0.518743714, 5.355102224))
            ThreePointArc((-0.518743714, 5.355102224), (-0.259371857, 2.677551112), (-0.103748743, -0.006016507))
            Line((-0.103748743, -0.006016507), (0.006016507, -0.103748743))
            ThreePointArc((0.006016507, -0.103748743), (1.555374994, -0.013899696), (3.115154376, -0.103748743))
            Line((3.115154376, -0.103748743), (3.109137869, 0))
        make_face()
    chamfer_1_piece_19b = extrude(amount=77.994577989, mode=Mode.PRIVATE)
    chamfer_1_piece_19b = split(chamfer_1_piece_19b, bisect_by=Plane(origin=(-32.956414026, -68.280647254, 12.999739571), z_dir=(-0.7715393663129642, -0.6361815827492885, 0)), keep=Keep.TOP, mode=Mode.PRIVATE)
    chamfer_1_piece_19 = chamfer_1_piece_19a & chamfer_1_piece_19b
    add(chamfer_1_piece_19, mode=Mode.SUBTRACT)
    with BuildSketch(Plane(origin=(-42.613166, -72.87234888, 14), x_dir=(0, -0.05789386240267318, -0.9983227437537925), z_dir=(1, 0, 0))) as chamfer_1_piece_20a_section:
        with BuildLine():
            Line((3.109137869, 0), (-0.414994971, 5.361118731))
            Line((-0.414994971, 5.361118731), (-0.518743714, 5.355102224))
            ThreePointArc((-0.518743714, 5.355102224), (-0.259371857, 2.677551112), (-0.103748743, -0.006016507))
            Line((-0.103748743, -0.006016507), (0.006016507, -0.103748743))
            ThreePointArc((0.006016507, -0.103748743), (1.555374994, -0.013899696), (3.115154376, -0.103748743))
            Line((3.115154376, -0.103748743), (3.109137869, 0))
        make_face()
    chamfer_1_piece_20a = extrude(amount=91.437469901, mode=Mode.PRIVATE)
    chamfer_1_piece_20a = split(chamfer_1_piece_20a, bisect_by=Plane(origin=(35.381411989, -71.129651477, 13.037990314), z_dir=(1, 0, 0)), keep=Keep.TOP, mode=Mode.PRIVATE)
    with BuildSketch(Plane(origin=(35.381411989, -86.315240792, 14), x_dir=(0.0578938624026709, 0, -0.9983227437537926), z_dir=(0, 1, 0))) as chamfer_1_piece_20b_section:
        with BuildLine():
            Line((3.109137869, 0), (-0.414994971, 5.361118731))
            Line((-0.414994971, 5.361118731), (-0.518743714, 5.355102224))
            ThreePointArc((-0.518743714, 5.355102224), (-0.259371857, 2.677551112), (-0.103748743, -0.006016507))
            Line((-0.103748743, -0.006016507), (0.006016507, -0.103748743))
            ThreePointArc((0.006016507, -0.103748743), (1.555374994, -0.013899696), (3.115154376, -0.103748743))
            Line((3.115154376, -0.103748743), (3.109137869, 0))
        make_face()
    chamfer_1_piece_20b = extrude(amount=20.029798654, mode=Mode.PRIVATE)
    chamfer_1_piece_20b = split(chamfer_1_piece_20b, bisect_by=Plane(origin=(33.638714586, -72.87234888, 13.037990314), z_dir=(0, -1, 0)), keep=Keep.TOP, mode=Mode.PRIVATE)
    chamfer_1_piece_20 = chamfer_1_piece_20a & chamfer_1_piece_20b
    add(chamfer_1_piece_20, mode=Mode.SUBTRACT)
    with BuildSketch(Plane(origin=(35.381411989, -72.87234888, 14), x_dir=(0.0578938624026709, 0, -0.9983227437537926), z_dir=(0, 1, 0))) as chamfer_1_piece_21a_section:
        with BuildLine():
            Line((3.109137869, 0), (-0.414994971, 5.361118731))
            Line((-0.414994971, 5.361118731), (-0.518743714, 5.355102224))
            ThreePointArc((-0.518743714, 5.355102224), (-0.259371857, 2.677551112), (-0.103748743, -0.006016507))
            Line((-0.103748743, -0.006016507), (0.006016507, -0.103748743))
            ThreePointArc((0.006016507, -0.103748743), (1.555374994, -0.013899696), (3.115154376, -0.103748743))
            Line((3.115154376, -0.103748743), (3.109137869, 0))
        make_face()
    chamfer_1_piece_21a = extrude(amount=20.029798654, mode=Mode.PRIVATE)
    chamfer_1_piece_21a = split(chamfer_1_piece_21a, bisect_by=Plane(origin=(33.638714586, -66.285442138, 13.037990314), z_dir=(0, 1, 0)), keep=Keep.TOP, mode=Mode.PRIVATE)
    with BuildSketch(Plane(origin=(21.938520077, -66.285442138, 14), x_dir=(0, -0.05789386240267318, -0.9983227437537925), z_dir=(1, 0, 0))) as chamfer_1_piece_21b_section:
        with BuildLine():
            Line((3.109137869, 0), (-0.414994971, 5.361118731))
            Line((-0.414994971, 5.361118731), (-0.518743714, 5.355102224))
            ThreePointArc((-0.518743714, 5.355102224), (-0.259371857, 2.677551112), (-0.103748743, -0.006016507))
            Line((-0.103748743, -0.006016507), (0.006016507, -0.103748743))
            ThreePointArc((0.006016507, -0.103748743), (1.555374994, -0.013899696), (3.115154376, -0.103748743))
            Line((3.115154376, -0.103748743), (3.109137869, 0))
        make_face()
    chamfer_1_piece_21b = extrude(amount=21.841198009, mode=Mode.PRIVATE)
    chamfer_1_piece_21b = split(chamfer_1_piece_21b, bisect_by=Plane(origin=(35.381411989, -64.542744735, 13.037990314), z_dir=(-1, 0, 0)), keep=Keep.TOP, mode=Mode.PRIVATE)
    chamfer_1_piece_21 = chamfer_1_piece_21a & chamfer_1_piece_21b
    add(chamfer_1_piece_21, mode=Mode.SUBTRACT)
    with BuildSketch(Plane(origin=(35.381411989, -66.285442138, 14), x_dir=(0, -0.05789386240267318, -0.9983227437537925), z_dir=(1, 0, 0))) as chamfer_1_piece_22a_section:
        with BuildLine():
            Line((3.109137869, 0), (-0.414994971, 5.361118731))
            Line((-0.414994971, 5.361118731), (-0.518743714, 5.355102224))
            ThreePointArc((-0.518743714, 5.355102224), (-0.259371857, 2.677551112), (-0.103748743, -0.006016507))
            Line((-0.103748743, -0.006016507), (0.006016507, -0.103748743))
            ThreePointArc((0.006016507, -0.103748743), (1.555374994, -0.013899696), (3.115154376, -0.103748743))
            Line((3.115154376, -0.103748743), (3.109137869, 0))
        make_face()
    chamfer_1_piece_22a = extrude(amount=21.841198009, mode=Mode.PRIVATE)
    chamfer_1_piece_22a = split(chamfer_1_piece_22a, bisect_by=Plane(origin=(43.779718086, -64.542744735, 13.037990314), z_dir=(1, 0, 0)), keep=Keep.TOP, mode=Mode.PRIVATE)
    with BuildSketch(Plane(origin=(43.779718086, -79.728334049, 14), x_dir=(0.0578938624026709, 0, -0.9983227437537926), z_dir=(0, 1, 0))) as chamfer_1_piece_22b_section:
        with BuildLine():
            Line((3.109137869, 0), (-0.414994971, 5.361118731))
            Line((-0.414994971, 5.361118731), (-0.518743714, 5.355102224))
            ThreePointArc((-0.518743714, 5.355102224), (-0.259371857, 2.677551112), (-0.103748743, -0.006016507))
            Line((-0.103748743, -0.006016507), (0.006016507, -0.103748743))
            ThreePointArc((0.006016507, -0.103748743), (1.555374994, -0.013899696), (3.115154376, -0.103748743))
            Line((3.115154376, -0.103748743), (3.109137869, 0))
        make_face()
    chamfer_1_piece_22b = extrude(amount=51.751356777, mode=Mode.PRIVATE)
    chamfer_1_piece_22b = split(chamfer_1_piece_22b, bisect_by=Plane(origin=(42.037020683, -66.285442138, 13.037990314), z_dir=(0, -1, 0)), keep=Keep.TOP, mode=Mode.PRIVATE)
    chamfer_1_piece_22 = chamfer_1_piece_22a & chamfer_1_piece_22b
    add(chamfer_1_piece_22, mode=Mode.SUBTRACT)
    with BuildSketch(Plane(origin=(43.779718086, -66.285442138, 14), x_dir=(0.0578938624026709, 0, -0.9983227437537926), z_dir=(0, 1, 0))) as chamfer_1_piece_23a_section:
        with BuildLine():
            Line((3.109137869, 0), (-0.414994971, 5.361118731))
            Line((-0.414994971, 5.361118731), (-0.518743714, 5.355102224))
            ThreePointArc((-0.518743714, 5.355102224), (-0.259371857, 2.677551112), (-0.103748743, -0.006016507))
            Line((-0.103748743, -0.006016507), (0.006016507, -0.103748743))
            ThreePointArc((0.006016507, -0.103748743), (1.555374994, -0.013899696), (3.115154376, -0.103748743))
            Line((3.115154376, -0.103748743), (3.109137869, 0))
        make_face()
    chamfer_1_piece_23a = extrude(amount=38.308464865, mode=Mode.PRIVATE)
    chamfer_1_piece_23a = split(chamfer_1_piece_23a, bisect_by=Plane(origin=(39.390358101, -36.09660282, 12.978371613), z_dir=(0.7715393663129643, 0.6361815827492884, 0)), keep=Keep.TOP, mode=Mode.PRIVATE)
    with BuildSketch(Plane(origin=(52.331838339, -51.791589491, 14), x_dir=(0.04466739391156704, 0.036831009014801006, -0.9983227437537926), z_dir=(-0.6361815827492884, 0.7715393663129643, 0))) as chamfer_1_piece_23b_section:
        with BuildLine():
            Line((3.109137869, 0), (-0.414994971, 5.361118731))
            Line((-0.414994971, 5.361118731), (-0.518743714, 5.355102224))
            ThreePointArc((-0.518743714, 5.355102224), (-0.259371857, 2.677551112), (-0.103748743, -0.006016507))
            Line((-0.103748743, -0.006016507), (0.006016507, -0.103748743))
            ThreePointArc((0.006016507, -0.103748743), (1.555374994, -0.013899696), (3.115154376, -0.103748743))
            Line((3.115154376, -0.103748743), (3.109137869, 0))
        make_face()
    chamfer_1_piece_23b = extrude(amount=33.486341215, mode=Mode.PRIVATE)
    chamfer_1_piece_23b = split(chamfer_1_piece_23b, bisect_by=Plane(origin=(43.779718086, -48.319408724, 12.978371613), z_dir=(1, 0, 0)), keep=Keep.TOP, mode=Mode.PRIVATE)
    chamfer_1_piece_23 = chamfer_1_piece_23a & chamfer_1_piece_23b
    add(chamfer_1_piece_23, mode=Mode.SUBTRACT)
    with BuildSketch(Plane(origin=(52.331838339, -51.791589491, 14), x_dir=(0.04466739391156704, 0.036831009014801006, -0.9983227437537926), z_dir=(-0.6361815827492884, 0.7715393663129643, 0))) as chamfer_1_piece_24a_section:
        with BuildLine():
            Line((3.109137869, 0), (-0.414994971, 5.361118731))
            Line((-0.414994971, 5.361118731), (-0.518743714, 5.355102224))
            ThreePointArc((-0.518743714, 5.355102224), (-0.259371857, 2.677551112), (-0.103748743, -0.006016507))
            Line((-0.103748743, -0.006016507), (0.006016507, -0.103748743))
            ThreePointArc((0.006016507, -0.103748743), (1.555374994, -0.013899696), (3.115154376, -0.103748743))
            Line((3.115154376, -0.103748743), (3.109137869, 0))
        make_face()
    chamfer_1_piece_24a = extrude(amount=33.486341215, mode=Mode.PRIVATE)
    chamfer_1_piece_24a = split(chamfer_1_piece_24a, bisect_by=Plane(origin=(33.629213977, -36.327279317, 12.999739571), z_dir=(0, 1, 0)), keep=Keep.TOP, mode=Mode.PRIVATE)
    with BuildSketch(Plane(origin=(53.023456949, -36.327279317, 14), x_dir=(0, 0.0578938624026709, -0.9983227437537926), z_dir=(-1, 0, 0))) as chamfer_1_piece_24b_section:
        with BuildLine():
            Line((3.109137869, 0), (-0.414994971, 5.361118731))
            Line((-0.414994971, 5.361118731), (-0.518743714, 5.355102224))
            ThreePointArc((-0.518743714, 5.355102224), (-0.259371857, 2.677551112), (-0.103748743, -0.006016507))
            Line((-0.103748743, -0.006016507), (0.006016507, -0.103748743))
            ThreePointArc((0.006016507, -0.103748743), (1.555374994, -0.013899696), (3.115154376, -0.103748743))
            Line((3.115154376, -0.103748743), (3.109137869, 0))
        make_face()
    chamfer_1_piece_24b = extrude(amount=70.439058267, mode=Mode.PRIVATE)
    chamfer_1_piece_24b = split(chamfer_1_piece_24b, bisect_by=Plane(origin=(43.366704975, -40.918980943, 12.999739571), z_dir=(0.7715393663129643, 0.6361815827492884, 0)), keep=Keep.TOP, mode=Mode.PRIVATE)
    chamfer_1_piece_24 = chamfer_1_piece_24a & chamfer_1_piece_24b
    add(chamfer_1_piece_24, mode=Mode.SUBTRACT)
    with BuildSketch(Plane(origin=(-12.524829659, -25.95555901, 14), x_dir=(-0.04466739391156709, -0.03683100901480115, -0.9983227437537926), z_dir=(0.6361815827492894, -0.7715393663129635, 0))) as chamfer_1_piece_25a_section:
        with BuildLine():
            Line((3.109137869, 0), (-0.414994971, 5.361118731))
            Line((-0.414994971, 5.361118731), (-0.518743714, 5.355102224))
            ThreePointArc((-0.518743714, 5.355102224), (-0.259371857, 2.677551112), (-0.103748743, -0.006016507))
            Line((-0.103748743, -0.006016507), (0.006016507, -0.103748743))
            ThreePointArc((0.006016507, -0.103748743), (1.555374994, -0.013899696), (3.115154376, -0.103748743))
            Line((3.115154376, -0.103748743), (3.109137869, 0))
        make_face()
    chamfer_1_piece_25a = extrude(amount=29.431096805, mode=Mode.PRIVATE)
    chamfer_1_piece_25a = split(chamfer_1_piece_25a, bisect_by=Plane(origin=(3.597922896, -38.291088482, 12.999739571), z_dir=(0, -1, 0)), keep=Keep.TOP, mode=Mode.PRIVATE)
    with BuildSketch(Plane(origin=(11.089463747, -38.291088482, 14), x_dir=(0, 0.0578938624026709, -0.9983227437537926), z_dir=(-1, 0, 0))) as chamfer_1_piece_25b_section:
        with BuildLine():
            Line((3.109137869, 0), (-0.414994971, 5.361118731))
            Line((-0.414994971, 5.361118731), (-0.518743714, 5.355102224))
            ThreePointArc((-0.518743714, 5.355102224), (-0.259371857, 2.677551112), (-0.103748743, -0.006016507))
            Line((-0.103748743, -0.006016507), (0.006016507, -0.103748743))
            ThreePointArc((0.006016507, -0.103748743), (1.555374994, -0.013899696), (3.115154376, -0.103748743))
            Line((3.115154376, -0.103748743), (3.109137869, 0))
        make_face()
    chamfer_1_piece_25b = extrude(amount=47.999353257, mode=Mode.PRIVATE)
    chamfer_1_piece_25b = split(chamfer_1_piece_25b, bisect_by=Plane(origin=(1.432711772, -42.882790108, 12.999739571), z_dir=(0.7715393663129635, 0.6361815827492894, 0)), keep=Keep.TOP, mode=Mode.PRIVATE)
    chamfer_1_piece_25 = chamfer_1_piece_25a & chamfer_1_piece_25b
    add(chamfer_1_piece_25, mode=Mode.SUBTRACT)
    with BuildSketch(Plane(origin=(-36.909889511, -24.84819657, 14), x_dir=(-0.0578938624026709, 0, -0.9983227437537926), z_dir=(0, -1, 0))) as chamfer_1_piece_26a_section:
        with BuildLine():
            Line((3.109137869, 0), (-0.414994971, 5.361118731))
            Line((-0.414994971, 5.361118731), (-0.518743714, 5.355102224))
            ThreePointArc((-0.518743714, 5.355102224), (-0.259371857, 2.677551112), (-0.103748743, -0.006016507))
            Line((-0.103748743, -0.006016507), (0.006016507, -0.103748743))
            ThreePointArc((0.006016507, -0.103748743), (1.555374994, -0.013899696), (3.115154376, -0.103748743))
            Line((3.115154376, -0.103748743), (3.109137869, 0))
        make_face()
    chamfer_1_piece_26a = extrude(amount=24.475960706, mode=Mode.PRIVATE)
    chamfer_1_piece_26a = split(chamfer_1_piece_26a, bisect_by=Plane(origin=(-35.167192108, -38.291088482, 13.037990314), z_dir=(0, 1, 0)), keep=Keep.TOP, mode=Mode.PRIVATE)
    with BuildSketch(Plane(origin=(11.089463747, -38.291088482, 14), x_dir=(0, 0.0578938624026709, -0.9983227437537926), z_dir=(-1, 0, 0))) as chamfer_1_piece_26b_section:
        with BuildLine():
            Line((3.109137869, 0), (-0.414994971, 5.361118731))
            Line((-0.414994971, 5.361118731), (-0.518743714, 5.355102224))
            ThreePointArc((-0.518743714, 5.355102224), (-0.259371857, 2.677551112), (-0.103748743, -0.006016507))
            Line((-0.103748743, -0.006016507), (0.006016507, -0.103748743))
            ThreePointArc((0.006016507, -0.103748743), (1.555374994, -0.013899696), (3.115154376, -0.103748743))
            Line((3.115154376, -0.103748743), (3.109137869, 0))
        make_face()
    chamfer_1_piece_26b = extrude(amount=61.442245169, mode=Mode.PRIVATE)
    chamfer_1_piece_26b = split(chamfer_1_piece_26b, bisect_by=Plane(origin=(-36.909889511, -40.033785885, 13.037990314), z_dir=(-1, 0, 0)), keep=Keep.TOP, mode=Mode.PRIVATE)
    chamfer_1_piece_26 = chamfer_1_piece_26a & chamfer_1_piece_26b
    add(chamfer_1_piece_26, mode=Mode.SUBTRACT)


with BuildPart() as body_2:
    # Эскиз2 → Бобышка-Вытянуть2 (new body)
    with BuildSketch(Plane.XY):
        with Locations((-67.123183615, -74.790238099)):
            Circle(SKETCH_2_R)
    extrude(amount=EXTRUDE_2_DEPTH)


with BuildPart() as body_3:
    # Эскиз2 → Extrude 2 2 (new body)
    with BuildSketch(Plane.XY):
        with Locations((-67.123183615, -81.585318196)):
            Circle(SKETCH_2_R)
    extrude(amount=EXTRUDE_2_2_DEPTH)


with BuildPart() as body_4:
    # Эскиз2 → Extrude 2 3 (new body)
    with BuildSketch(Plane.XY):
        with Locations((-59.555935325, -81.585318196)):
            Circle(SKETCH_2_R)
    extrude(amount=EXTRUDE_2_3_DEPTH)


with BuildPart() as body_5:
    # Эскиз2 → Extrude 2 4 (new body)
    with BuildSketch(Plane.XY):
        with Locations((-42.207965026, 45.607198889)):
            Rectangle(SKETCH_2_W, SKETCH_2_H)
    extrude(amount=EXTRUDE_2_4_DEPTH)


with BuildPart() as body_6:
    # Эскиз2 → Extrude 2 5 (new body)
    with BuildSketch(Plane.XY):
        with Locations((-42.207965026, 54.107198889)):
            Rectangle(SKETCH_2_W, SKETCH_2_H)
    extrude(amount=EXTRUDE_2_5_DEPTH)


with BuildPart() as body_7:
    # Эскиз2 → Extrude 2 6 (new body)
    with BuildSketch(Plane.XY):
        with Locations((-42.207965026, 37.107198889)):
            Rectangle(SKETCH_2_W, SKETCH_2_H)
    extrude(amount=EXTRUDE_2_6_DEPTH)


with BuildPart() as body_8:
    # Эскиз2 → Extrude 2 7 (new body)
    with BuildSketch(Plane.XY):
        with Locations((-42.207965026, 28.607198889)):
            Rectangle(SKETCH_2_W, SKETCH_2_H)
    extrude(amount=EXTRUDE_2_7_DEPTH)


with BuildPart() as body_9:
    # Эскиз2 → Extrude 2 8 (new body)
    with BuildSketch(Plane.XY):
        with Locations((-42.207965026, 20.107198889)):
            Rectangle(SKETCH_2_W, SKETCH_2_H)
    extrude(amount=EXTRUDE_2_8_DEPTH)


with BuildPart() as body_10:
    # Эскиз2 → Extrude 2 9 (new body)
    with BuildSketch(Plane.XY):
        with Locations((-42.207965026, 11.607198889)):
            Rectangle(SKETCH_2_W, SKETCH_2_H)
    extrude(amount=EXTRUDE_2_9_DEPTH)


solid = Compound([part.part, body_2.part, body_3.part, body_4.part, body_5.part, body_6.part, body_7.part, body_8.part, body_9.part, body_10.part])
